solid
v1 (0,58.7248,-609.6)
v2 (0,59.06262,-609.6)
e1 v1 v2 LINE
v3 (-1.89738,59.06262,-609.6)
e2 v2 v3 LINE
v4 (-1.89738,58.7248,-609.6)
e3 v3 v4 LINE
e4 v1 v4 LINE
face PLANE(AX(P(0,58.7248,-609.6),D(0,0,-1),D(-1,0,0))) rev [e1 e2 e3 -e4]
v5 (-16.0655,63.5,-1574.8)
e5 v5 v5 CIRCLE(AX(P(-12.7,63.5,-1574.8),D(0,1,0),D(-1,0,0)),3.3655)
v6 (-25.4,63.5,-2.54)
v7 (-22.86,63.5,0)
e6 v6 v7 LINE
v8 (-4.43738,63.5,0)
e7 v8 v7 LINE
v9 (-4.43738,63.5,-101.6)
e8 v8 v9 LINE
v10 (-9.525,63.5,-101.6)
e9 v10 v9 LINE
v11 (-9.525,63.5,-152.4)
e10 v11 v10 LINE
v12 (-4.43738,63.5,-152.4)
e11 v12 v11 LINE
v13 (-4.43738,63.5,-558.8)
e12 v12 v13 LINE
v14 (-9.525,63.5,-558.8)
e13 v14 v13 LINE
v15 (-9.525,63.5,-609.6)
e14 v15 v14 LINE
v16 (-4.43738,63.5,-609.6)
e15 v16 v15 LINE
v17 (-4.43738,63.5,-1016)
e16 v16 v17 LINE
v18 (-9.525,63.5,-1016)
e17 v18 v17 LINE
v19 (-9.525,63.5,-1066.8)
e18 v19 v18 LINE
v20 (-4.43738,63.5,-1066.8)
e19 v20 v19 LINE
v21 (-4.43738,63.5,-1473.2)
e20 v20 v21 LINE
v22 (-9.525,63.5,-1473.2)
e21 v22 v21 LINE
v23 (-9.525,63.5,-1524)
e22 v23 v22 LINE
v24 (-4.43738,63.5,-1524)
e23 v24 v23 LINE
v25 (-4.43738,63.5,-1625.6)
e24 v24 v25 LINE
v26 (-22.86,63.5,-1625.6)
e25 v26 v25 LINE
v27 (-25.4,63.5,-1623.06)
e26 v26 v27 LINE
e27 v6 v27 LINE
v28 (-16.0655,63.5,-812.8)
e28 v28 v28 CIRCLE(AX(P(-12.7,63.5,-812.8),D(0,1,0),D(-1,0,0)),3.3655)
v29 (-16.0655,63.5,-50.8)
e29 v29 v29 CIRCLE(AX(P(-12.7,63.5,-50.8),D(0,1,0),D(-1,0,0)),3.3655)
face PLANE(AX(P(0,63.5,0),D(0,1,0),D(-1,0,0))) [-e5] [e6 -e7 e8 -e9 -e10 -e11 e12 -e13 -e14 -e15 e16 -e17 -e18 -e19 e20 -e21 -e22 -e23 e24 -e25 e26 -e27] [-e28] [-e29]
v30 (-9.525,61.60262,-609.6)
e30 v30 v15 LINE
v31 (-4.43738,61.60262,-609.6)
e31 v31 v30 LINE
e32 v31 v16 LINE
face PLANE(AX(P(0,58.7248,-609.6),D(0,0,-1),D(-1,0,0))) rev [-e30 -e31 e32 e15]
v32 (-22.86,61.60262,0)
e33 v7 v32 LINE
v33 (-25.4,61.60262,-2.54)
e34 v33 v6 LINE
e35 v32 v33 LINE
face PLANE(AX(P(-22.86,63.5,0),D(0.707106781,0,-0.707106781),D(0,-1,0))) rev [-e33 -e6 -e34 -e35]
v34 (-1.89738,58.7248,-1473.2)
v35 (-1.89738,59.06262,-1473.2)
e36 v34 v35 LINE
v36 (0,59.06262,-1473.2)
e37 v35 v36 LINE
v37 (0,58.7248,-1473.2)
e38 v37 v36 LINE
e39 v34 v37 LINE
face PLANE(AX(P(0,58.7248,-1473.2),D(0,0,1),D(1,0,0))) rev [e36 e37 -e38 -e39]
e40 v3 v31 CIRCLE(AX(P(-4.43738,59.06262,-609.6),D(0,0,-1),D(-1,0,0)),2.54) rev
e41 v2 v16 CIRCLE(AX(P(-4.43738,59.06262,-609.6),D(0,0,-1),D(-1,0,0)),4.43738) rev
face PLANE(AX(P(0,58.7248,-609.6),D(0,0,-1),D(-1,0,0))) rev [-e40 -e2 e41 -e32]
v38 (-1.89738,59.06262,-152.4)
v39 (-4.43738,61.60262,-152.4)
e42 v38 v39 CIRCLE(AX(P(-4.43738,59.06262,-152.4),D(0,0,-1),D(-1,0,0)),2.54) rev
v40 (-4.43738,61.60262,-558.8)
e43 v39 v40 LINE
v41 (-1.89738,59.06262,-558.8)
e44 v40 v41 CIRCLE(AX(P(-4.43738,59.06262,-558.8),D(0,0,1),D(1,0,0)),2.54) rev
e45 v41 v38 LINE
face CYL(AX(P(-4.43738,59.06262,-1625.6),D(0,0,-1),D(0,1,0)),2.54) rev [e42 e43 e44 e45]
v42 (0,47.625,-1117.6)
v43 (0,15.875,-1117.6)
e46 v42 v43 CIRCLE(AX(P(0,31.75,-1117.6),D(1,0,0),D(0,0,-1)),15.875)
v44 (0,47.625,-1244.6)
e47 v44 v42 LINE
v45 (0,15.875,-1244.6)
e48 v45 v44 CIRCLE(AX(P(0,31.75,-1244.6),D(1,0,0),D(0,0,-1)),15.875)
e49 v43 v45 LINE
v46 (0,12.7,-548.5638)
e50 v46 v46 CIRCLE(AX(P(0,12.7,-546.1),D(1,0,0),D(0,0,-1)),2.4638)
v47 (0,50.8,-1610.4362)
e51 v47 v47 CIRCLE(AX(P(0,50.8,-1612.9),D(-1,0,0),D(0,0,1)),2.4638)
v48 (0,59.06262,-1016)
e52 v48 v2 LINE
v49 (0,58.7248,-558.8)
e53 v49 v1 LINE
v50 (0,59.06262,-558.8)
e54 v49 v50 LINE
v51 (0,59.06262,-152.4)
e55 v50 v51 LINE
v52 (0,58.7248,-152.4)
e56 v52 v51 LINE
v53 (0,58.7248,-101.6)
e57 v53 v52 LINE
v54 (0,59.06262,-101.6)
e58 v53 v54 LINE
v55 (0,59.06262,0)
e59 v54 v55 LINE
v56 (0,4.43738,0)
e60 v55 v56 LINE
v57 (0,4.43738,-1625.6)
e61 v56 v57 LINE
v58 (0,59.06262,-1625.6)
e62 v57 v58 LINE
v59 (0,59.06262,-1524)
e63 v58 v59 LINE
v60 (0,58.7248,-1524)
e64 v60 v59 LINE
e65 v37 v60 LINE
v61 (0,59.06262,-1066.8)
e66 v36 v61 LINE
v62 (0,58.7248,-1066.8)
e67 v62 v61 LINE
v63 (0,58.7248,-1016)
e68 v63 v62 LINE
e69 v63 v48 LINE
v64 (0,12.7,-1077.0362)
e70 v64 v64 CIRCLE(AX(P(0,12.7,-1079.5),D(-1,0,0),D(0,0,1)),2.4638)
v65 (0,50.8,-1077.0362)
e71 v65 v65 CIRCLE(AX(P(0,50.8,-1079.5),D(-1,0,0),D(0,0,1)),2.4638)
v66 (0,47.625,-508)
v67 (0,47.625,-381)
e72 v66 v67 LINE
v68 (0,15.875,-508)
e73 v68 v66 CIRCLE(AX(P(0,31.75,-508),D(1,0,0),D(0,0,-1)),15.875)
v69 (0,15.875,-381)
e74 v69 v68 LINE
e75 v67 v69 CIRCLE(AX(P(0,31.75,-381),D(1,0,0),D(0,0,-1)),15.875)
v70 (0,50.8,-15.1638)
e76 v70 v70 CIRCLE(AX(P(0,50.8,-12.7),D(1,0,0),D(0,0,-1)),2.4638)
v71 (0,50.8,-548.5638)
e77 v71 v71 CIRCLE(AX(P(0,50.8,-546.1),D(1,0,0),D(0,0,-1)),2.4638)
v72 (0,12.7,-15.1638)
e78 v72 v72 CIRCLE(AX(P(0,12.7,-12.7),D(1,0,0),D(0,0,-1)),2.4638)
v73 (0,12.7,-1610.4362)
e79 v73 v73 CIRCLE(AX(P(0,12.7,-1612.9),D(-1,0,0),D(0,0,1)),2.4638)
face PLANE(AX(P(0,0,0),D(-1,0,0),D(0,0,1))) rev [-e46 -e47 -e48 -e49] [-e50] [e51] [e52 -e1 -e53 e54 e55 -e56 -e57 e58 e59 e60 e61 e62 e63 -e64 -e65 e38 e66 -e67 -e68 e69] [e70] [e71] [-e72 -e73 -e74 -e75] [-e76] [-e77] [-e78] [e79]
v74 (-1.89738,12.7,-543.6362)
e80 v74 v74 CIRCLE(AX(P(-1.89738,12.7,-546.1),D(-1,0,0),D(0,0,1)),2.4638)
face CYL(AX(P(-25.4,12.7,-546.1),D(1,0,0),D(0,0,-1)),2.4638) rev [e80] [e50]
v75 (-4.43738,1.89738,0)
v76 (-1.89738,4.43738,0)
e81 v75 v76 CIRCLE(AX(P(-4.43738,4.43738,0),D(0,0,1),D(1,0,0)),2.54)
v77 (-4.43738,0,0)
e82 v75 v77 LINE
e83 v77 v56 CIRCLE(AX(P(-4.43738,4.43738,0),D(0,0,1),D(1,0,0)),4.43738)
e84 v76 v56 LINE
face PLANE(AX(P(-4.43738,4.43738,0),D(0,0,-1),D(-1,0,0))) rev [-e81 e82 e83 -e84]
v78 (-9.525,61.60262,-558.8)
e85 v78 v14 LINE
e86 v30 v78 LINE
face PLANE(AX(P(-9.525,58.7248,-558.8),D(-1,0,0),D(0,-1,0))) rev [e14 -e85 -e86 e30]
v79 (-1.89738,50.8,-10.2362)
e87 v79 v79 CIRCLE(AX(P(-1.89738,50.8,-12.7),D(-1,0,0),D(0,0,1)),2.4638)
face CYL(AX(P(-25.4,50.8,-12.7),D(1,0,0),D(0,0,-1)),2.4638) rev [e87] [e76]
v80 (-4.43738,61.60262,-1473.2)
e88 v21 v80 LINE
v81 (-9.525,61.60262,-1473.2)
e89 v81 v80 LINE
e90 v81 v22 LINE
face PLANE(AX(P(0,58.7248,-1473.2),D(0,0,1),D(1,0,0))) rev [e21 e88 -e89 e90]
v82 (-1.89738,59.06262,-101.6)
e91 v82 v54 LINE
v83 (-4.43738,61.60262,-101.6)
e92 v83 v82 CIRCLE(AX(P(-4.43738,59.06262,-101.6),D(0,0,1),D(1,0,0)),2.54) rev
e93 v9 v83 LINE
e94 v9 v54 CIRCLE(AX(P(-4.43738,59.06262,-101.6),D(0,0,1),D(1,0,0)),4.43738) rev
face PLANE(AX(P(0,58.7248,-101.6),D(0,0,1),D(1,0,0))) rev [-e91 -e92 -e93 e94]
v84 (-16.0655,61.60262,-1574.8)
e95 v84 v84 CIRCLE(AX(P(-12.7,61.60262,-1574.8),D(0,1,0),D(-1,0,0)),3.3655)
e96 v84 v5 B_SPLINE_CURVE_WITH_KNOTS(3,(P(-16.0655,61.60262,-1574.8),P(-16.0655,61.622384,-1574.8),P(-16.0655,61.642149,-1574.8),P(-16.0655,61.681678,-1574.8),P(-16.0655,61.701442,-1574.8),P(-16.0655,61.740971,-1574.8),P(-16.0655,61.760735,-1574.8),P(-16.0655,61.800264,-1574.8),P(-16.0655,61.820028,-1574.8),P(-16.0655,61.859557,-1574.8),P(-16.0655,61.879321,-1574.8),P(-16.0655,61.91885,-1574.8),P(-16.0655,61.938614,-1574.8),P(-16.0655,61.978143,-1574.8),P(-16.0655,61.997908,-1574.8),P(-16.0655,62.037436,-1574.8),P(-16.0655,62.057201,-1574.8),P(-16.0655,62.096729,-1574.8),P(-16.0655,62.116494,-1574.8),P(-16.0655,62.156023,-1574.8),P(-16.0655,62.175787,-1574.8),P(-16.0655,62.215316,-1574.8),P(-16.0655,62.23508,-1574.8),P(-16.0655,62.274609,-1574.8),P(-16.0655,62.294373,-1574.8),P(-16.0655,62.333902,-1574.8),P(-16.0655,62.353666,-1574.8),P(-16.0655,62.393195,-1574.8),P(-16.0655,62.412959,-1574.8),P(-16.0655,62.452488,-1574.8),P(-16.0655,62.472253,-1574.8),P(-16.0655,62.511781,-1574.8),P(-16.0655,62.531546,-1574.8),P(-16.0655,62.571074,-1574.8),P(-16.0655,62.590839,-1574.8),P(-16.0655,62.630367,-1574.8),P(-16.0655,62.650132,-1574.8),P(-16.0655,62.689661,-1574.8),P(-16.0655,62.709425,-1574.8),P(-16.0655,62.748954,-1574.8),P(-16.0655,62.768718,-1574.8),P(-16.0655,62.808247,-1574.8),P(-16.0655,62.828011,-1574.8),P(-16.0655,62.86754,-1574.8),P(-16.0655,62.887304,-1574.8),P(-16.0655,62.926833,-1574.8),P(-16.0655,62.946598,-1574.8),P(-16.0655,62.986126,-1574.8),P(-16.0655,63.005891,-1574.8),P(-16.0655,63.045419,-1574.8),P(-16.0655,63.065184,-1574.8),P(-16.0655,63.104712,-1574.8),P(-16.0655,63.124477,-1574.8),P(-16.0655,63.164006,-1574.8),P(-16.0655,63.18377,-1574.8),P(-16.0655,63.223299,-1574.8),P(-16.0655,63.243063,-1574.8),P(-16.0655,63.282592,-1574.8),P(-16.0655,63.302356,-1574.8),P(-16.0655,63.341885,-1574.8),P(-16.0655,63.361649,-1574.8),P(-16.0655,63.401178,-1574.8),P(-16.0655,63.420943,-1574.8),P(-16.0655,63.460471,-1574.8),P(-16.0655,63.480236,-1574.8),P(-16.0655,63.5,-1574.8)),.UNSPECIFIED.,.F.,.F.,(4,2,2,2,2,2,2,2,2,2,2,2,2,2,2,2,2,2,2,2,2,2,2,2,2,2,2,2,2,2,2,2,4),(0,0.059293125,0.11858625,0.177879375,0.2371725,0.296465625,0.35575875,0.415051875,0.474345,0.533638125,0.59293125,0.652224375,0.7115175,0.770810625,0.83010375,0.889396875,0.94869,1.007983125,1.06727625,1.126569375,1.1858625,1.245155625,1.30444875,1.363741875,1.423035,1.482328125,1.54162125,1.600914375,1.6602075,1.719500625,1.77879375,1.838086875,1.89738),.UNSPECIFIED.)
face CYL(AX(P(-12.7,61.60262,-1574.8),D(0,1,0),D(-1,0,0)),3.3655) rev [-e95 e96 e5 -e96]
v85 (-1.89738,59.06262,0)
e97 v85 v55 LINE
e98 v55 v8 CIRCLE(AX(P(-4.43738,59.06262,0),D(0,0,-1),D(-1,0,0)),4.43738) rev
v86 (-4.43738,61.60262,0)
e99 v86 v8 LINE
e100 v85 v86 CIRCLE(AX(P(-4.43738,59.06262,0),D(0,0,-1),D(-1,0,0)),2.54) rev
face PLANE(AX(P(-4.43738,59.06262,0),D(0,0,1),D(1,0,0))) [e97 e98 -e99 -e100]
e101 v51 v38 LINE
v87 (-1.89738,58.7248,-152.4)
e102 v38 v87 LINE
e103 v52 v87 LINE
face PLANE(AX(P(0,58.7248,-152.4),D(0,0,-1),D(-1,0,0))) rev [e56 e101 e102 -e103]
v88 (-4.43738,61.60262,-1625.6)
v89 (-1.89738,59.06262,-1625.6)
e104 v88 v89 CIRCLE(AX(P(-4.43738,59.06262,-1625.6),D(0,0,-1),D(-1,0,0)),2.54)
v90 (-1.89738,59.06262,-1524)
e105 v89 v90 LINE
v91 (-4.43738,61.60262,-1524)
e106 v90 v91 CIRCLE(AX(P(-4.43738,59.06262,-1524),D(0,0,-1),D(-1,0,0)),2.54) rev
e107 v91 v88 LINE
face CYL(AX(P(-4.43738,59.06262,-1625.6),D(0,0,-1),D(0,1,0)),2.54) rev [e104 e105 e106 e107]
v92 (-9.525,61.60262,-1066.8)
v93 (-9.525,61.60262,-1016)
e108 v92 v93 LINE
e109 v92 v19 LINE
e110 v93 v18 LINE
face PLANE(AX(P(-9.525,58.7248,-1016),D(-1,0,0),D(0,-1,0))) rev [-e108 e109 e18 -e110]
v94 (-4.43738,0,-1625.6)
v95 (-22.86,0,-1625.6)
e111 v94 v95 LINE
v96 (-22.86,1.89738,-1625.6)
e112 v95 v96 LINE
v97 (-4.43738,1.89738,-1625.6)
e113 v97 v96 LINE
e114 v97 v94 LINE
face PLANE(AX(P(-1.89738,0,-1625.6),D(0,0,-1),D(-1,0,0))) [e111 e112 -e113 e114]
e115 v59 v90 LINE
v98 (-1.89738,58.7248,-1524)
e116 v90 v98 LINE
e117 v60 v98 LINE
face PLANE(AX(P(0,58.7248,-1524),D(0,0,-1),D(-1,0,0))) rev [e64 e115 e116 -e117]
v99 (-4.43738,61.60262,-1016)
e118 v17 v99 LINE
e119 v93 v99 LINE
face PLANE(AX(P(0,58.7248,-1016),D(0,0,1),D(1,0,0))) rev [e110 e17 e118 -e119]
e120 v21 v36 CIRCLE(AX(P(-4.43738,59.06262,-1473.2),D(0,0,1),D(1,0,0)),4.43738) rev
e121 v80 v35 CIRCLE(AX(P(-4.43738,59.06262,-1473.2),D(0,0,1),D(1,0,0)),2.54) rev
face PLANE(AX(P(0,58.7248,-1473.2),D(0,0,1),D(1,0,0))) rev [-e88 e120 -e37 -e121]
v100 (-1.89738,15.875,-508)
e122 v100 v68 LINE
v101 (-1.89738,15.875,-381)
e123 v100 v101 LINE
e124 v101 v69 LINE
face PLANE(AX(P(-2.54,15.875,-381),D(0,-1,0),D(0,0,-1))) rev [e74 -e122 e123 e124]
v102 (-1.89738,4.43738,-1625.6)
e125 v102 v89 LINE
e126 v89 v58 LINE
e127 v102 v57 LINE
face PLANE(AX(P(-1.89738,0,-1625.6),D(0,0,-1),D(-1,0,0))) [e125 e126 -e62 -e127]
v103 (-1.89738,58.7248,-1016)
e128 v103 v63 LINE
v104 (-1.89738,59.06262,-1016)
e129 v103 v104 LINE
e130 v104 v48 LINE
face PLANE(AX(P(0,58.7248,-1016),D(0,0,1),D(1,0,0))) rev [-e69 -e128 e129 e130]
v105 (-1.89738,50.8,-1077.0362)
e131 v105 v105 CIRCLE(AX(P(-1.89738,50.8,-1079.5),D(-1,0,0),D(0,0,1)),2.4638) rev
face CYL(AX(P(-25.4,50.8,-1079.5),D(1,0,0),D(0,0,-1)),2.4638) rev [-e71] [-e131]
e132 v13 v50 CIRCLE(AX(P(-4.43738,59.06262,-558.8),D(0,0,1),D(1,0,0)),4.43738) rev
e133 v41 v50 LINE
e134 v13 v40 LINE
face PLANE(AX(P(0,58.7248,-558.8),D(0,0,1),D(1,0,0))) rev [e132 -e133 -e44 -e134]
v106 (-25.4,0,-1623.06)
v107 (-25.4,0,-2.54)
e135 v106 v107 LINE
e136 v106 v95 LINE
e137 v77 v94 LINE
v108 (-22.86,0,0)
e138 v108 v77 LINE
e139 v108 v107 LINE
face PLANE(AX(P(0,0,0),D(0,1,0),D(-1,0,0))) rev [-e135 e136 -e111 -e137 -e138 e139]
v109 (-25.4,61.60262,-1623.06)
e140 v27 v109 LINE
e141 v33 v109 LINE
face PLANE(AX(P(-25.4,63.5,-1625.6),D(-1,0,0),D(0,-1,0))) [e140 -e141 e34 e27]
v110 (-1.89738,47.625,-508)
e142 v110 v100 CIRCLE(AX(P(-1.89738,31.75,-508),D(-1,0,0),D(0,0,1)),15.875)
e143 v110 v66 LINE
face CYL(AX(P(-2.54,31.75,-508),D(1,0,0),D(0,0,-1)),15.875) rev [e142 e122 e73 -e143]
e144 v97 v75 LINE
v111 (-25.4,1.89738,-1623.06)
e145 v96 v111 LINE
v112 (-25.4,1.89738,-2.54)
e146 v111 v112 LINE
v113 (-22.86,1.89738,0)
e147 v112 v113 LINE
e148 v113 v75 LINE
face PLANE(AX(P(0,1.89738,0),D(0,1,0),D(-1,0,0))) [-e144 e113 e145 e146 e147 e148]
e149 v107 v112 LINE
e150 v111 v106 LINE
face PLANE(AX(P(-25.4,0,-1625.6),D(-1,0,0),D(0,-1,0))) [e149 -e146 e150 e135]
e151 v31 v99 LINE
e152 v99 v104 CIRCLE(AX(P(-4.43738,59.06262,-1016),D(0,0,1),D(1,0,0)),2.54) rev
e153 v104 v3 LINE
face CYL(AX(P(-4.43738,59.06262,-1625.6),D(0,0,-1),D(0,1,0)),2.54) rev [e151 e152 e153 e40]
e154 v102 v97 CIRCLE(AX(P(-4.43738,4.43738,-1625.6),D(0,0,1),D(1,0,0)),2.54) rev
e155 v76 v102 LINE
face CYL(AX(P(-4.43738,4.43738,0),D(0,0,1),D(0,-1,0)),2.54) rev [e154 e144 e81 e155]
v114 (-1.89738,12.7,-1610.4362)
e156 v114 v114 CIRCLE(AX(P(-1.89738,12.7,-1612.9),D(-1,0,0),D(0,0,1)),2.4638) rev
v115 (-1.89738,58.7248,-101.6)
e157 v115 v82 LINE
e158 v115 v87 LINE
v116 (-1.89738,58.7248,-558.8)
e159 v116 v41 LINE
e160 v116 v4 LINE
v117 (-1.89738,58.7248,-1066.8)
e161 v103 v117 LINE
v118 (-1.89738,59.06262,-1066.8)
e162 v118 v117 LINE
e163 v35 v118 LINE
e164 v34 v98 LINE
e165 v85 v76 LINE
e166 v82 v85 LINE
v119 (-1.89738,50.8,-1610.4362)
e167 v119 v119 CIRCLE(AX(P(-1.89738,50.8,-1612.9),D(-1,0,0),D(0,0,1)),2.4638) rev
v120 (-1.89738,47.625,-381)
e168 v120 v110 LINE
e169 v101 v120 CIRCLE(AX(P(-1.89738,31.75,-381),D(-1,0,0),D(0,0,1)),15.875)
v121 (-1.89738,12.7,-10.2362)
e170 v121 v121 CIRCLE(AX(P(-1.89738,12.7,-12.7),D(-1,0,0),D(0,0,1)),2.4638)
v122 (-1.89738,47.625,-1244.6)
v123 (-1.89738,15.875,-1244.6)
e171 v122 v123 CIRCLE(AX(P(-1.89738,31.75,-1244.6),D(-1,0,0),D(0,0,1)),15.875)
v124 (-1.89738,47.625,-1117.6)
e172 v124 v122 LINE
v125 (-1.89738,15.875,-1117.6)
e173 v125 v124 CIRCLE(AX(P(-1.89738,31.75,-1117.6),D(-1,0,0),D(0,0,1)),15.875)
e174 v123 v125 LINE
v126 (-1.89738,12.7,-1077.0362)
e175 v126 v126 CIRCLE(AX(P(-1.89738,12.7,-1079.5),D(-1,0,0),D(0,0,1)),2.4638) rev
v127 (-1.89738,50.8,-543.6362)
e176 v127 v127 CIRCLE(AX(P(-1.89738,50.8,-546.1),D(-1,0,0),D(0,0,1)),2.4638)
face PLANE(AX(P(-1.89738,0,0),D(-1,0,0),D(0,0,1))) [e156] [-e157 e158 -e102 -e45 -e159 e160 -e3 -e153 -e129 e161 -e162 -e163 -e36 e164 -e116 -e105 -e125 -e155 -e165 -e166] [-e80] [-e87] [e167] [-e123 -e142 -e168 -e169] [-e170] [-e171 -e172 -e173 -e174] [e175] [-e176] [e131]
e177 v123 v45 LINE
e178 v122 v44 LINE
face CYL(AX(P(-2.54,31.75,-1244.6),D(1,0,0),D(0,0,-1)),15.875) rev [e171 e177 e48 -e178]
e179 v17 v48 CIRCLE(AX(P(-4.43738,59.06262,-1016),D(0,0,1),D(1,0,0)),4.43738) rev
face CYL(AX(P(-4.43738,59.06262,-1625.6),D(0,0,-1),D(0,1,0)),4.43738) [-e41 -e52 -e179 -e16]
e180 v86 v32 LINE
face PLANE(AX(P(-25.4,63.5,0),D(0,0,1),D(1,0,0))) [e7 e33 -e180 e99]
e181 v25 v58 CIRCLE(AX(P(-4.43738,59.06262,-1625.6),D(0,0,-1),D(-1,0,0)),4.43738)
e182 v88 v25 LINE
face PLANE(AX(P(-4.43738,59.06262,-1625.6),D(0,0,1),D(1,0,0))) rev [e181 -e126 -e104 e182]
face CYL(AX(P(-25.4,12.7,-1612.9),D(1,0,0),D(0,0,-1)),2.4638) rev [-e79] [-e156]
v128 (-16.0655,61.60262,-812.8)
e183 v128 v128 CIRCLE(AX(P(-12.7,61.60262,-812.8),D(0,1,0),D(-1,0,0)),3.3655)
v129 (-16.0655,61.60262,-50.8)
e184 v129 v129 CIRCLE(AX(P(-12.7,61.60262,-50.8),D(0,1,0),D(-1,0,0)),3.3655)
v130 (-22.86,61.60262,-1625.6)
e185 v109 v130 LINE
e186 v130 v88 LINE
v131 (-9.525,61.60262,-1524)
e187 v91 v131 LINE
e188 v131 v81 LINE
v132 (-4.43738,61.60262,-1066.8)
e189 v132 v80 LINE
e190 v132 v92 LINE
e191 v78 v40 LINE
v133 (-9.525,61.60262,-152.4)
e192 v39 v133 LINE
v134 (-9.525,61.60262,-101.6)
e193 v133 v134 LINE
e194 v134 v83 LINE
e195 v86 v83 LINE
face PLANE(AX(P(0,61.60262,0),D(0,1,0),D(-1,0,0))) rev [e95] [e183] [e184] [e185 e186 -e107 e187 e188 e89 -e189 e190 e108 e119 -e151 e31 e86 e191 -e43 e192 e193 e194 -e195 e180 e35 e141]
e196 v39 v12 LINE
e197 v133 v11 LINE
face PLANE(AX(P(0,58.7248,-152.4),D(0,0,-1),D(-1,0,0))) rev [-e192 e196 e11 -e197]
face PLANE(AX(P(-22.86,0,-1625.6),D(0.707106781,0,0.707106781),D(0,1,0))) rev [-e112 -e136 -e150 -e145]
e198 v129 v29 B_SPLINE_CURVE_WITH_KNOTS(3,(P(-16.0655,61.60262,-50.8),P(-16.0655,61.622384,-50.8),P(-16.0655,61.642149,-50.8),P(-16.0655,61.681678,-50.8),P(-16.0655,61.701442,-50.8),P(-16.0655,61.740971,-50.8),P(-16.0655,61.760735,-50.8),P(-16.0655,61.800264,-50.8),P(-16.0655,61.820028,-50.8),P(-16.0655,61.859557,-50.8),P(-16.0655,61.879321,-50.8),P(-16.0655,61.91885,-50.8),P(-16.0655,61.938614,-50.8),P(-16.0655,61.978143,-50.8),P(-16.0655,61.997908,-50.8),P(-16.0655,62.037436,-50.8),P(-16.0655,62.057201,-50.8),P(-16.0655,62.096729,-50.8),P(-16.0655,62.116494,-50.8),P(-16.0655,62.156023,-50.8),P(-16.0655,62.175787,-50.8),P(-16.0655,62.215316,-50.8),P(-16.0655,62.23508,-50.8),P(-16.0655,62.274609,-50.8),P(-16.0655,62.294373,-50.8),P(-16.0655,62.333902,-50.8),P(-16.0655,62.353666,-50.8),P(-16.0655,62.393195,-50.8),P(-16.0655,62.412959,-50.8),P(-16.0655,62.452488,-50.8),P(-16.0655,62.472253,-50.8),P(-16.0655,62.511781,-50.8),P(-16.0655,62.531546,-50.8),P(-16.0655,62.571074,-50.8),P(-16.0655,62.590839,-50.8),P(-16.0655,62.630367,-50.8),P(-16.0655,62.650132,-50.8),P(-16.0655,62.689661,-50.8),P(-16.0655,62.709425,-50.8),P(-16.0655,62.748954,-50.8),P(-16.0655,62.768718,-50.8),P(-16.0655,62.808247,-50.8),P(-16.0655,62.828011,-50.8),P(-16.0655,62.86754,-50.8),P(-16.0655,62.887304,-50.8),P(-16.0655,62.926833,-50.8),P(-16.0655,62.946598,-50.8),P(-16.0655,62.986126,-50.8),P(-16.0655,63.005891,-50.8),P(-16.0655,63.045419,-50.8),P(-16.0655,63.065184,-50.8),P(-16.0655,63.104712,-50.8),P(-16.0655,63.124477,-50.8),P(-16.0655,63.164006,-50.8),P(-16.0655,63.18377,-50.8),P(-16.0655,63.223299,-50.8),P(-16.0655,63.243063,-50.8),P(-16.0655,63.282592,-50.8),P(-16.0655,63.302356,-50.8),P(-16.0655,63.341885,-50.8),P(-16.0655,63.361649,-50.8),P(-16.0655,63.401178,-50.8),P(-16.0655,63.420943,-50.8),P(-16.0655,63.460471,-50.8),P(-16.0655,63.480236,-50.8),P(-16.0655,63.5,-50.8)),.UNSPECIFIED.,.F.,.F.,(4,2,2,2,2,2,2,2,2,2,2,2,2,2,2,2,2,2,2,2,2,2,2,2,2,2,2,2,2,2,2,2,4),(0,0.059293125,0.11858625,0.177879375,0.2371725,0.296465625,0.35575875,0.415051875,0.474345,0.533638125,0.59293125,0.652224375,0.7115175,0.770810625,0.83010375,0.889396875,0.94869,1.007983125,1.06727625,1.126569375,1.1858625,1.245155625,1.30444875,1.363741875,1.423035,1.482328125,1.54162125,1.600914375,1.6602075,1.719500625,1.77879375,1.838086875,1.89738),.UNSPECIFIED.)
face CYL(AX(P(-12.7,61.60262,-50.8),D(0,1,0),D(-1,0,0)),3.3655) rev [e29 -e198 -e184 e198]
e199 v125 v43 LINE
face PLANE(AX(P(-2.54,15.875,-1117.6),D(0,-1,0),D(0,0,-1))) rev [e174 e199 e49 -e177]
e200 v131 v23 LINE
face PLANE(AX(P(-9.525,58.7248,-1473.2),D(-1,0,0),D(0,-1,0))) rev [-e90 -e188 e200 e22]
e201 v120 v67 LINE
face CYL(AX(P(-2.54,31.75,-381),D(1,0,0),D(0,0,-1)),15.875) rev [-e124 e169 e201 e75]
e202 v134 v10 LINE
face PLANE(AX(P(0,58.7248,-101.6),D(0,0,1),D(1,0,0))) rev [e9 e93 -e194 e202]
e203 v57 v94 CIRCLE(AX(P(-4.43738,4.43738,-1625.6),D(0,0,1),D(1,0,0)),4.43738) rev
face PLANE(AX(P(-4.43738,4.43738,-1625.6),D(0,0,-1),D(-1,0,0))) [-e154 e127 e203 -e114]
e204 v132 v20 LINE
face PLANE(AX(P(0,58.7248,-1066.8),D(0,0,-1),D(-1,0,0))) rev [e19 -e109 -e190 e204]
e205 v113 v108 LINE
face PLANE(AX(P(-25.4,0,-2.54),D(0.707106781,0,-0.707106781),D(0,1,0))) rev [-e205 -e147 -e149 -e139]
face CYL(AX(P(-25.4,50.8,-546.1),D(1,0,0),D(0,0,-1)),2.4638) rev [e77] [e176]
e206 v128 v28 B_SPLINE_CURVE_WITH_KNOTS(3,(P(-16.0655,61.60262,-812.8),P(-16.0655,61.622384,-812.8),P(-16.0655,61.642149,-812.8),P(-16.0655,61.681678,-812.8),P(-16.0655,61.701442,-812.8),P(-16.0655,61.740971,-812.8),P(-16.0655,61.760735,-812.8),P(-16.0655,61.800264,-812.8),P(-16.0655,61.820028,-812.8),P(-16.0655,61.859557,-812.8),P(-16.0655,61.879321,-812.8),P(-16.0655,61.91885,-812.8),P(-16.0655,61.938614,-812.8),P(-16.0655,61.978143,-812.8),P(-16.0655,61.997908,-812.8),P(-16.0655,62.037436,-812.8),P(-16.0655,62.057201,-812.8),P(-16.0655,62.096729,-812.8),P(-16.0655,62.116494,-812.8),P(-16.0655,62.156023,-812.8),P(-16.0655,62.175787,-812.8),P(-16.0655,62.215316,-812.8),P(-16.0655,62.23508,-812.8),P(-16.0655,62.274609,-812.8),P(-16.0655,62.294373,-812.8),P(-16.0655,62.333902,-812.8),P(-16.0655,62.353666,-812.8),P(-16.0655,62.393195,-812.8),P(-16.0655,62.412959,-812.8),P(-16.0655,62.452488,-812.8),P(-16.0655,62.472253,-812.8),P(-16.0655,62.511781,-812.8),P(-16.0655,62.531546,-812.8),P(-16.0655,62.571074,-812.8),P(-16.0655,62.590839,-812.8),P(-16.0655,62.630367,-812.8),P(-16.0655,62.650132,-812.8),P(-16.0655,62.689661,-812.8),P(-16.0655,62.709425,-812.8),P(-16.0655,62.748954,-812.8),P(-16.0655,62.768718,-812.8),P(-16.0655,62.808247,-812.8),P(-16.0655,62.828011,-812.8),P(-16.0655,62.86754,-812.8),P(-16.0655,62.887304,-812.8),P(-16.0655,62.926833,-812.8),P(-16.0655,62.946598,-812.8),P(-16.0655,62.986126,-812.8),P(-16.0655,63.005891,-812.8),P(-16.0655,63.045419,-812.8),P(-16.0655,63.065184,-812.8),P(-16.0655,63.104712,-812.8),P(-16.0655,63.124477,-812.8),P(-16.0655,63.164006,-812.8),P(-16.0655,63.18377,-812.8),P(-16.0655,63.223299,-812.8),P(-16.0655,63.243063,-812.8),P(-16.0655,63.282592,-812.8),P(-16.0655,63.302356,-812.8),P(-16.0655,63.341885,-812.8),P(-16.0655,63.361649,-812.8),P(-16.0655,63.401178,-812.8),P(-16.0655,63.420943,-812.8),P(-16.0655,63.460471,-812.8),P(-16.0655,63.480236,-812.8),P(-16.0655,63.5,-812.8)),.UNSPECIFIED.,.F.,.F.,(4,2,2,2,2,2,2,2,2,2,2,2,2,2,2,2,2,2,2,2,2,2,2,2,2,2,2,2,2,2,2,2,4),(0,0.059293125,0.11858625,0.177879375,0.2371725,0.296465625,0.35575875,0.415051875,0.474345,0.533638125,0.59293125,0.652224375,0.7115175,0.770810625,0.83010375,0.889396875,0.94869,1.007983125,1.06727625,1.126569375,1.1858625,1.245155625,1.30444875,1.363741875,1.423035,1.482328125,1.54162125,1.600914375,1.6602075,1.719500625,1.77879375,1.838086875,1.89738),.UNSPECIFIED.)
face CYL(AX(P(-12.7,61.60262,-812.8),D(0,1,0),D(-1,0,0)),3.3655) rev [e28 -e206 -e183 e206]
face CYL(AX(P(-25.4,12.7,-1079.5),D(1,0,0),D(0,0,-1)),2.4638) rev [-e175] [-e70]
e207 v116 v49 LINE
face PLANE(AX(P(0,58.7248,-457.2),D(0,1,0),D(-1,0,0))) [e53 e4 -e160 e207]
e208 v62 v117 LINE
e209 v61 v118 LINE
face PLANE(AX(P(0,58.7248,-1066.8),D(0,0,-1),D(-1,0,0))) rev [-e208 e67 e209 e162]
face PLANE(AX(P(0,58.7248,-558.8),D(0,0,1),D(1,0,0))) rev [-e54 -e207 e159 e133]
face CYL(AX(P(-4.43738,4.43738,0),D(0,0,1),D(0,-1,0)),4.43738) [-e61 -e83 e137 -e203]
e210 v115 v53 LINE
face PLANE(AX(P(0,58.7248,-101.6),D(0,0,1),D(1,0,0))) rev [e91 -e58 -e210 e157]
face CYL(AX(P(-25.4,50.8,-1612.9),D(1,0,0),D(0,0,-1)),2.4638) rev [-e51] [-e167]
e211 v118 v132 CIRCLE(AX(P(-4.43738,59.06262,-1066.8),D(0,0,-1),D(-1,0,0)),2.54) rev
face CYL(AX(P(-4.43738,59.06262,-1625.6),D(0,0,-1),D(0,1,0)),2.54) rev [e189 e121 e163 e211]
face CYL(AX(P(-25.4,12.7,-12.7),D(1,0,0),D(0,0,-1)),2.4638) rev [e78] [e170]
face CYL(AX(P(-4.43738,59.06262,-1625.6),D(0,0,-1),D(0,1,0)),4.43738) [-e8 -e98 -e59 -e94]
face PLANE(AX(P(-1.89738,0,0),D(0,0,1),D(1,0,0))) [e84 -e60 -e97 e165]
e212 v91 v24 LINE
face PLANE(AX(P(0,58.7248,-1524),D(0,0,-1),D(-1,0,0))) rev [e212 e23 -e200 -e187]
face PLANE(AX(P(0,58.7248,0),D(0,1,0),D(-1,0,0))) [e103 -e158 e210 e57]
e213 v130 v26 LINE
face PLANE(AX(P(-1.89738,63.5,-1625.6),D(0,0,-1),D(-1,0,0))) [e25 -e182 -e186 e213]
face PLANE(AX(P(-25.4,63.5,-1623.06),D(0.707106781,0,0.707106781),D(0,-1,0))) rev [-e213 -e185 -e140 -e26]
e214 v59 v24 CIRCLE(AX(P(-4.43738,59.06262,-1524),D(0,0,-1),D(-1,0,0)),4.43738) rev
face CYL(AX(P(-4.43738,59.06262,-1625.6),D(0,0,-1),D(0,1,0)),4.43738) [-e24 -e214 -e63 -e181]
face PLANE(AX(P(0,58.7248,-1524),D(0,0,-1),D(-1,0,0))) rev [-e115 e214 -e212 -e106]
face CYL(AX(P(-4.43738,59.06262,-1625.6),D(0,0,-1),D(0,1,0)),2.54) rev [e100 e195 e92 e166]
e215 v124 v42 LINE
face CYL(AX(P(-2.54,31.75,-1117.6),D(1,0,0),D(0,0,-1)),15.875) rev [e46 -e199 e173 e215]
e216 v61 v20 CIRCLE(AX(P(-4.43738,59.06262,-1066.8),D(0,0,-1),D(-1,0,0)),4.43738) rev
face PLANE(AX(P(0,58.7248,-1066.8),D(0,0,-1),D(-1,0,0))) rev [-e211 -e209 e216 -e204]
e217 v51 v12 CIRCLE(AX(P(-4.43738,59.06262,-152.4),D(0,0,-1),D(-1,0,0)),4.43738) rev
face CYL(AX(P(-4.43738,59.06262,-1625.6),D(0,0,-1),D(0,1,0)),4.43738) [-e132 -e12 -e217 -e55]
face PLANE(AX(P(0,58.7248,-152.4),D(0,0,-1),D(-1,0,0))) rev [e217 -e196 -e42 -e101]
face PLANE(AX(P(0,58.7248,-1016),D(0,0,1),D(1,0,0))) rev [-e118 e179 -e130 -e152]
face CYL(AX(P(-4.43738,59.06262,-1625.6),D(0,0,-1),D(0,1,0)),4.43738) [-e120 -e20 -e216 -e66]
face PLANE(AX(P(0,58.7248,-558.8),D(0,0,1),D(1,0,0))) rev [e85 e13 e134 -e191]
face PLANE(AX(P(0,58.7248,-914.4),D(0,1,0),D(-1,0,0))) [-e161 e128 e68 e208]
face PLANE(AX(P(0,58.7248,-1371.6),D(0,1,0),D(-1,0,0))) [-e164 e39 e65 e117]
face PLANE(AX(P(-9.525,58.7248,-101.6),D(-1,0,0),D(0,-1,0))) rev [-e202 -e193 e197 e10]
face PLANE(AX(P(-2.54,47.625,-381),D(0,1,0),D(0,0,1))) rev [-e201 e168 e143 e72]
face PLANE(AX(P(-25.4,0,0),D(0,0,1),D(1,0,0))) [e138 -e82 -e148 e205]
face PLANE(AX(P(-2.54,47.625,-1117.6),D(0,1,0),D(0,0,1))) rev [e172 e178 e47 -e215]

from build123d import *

# Parameters (mm, degrees)
SKETCH1_W                      = 1625.6
SKETCH1_H                      = 63.5
BASE_FLANGE1_DEPTH             = 1.89738
EDGE_FLANGE1_STRIP_W           = 12.66952
EDGE_FLANGE1_STRIP_H           = 1.89738
EDGE_FLANGE1_STRIP_CUT_DEPTH   = 1625.6
EDGE_FLANGE1_STRIP_2_W         = 12.66952
EDGE_FLANGE1_STRIP_2_H         = 1.89738
EDGE_FLANGE1_STRIP_CUT_2_DEPTH = 1625.6
EDGE_FLANGE1_DEPTH             = 1625.6
EDGE_FLANGE1_BEND_DEPTH        = 1625.6
SKETCH15_W                     = 9.525
SKETCH15_H                     = 50.8
CUT_EXTRUDE2_DEPTH             = 4.7752
LPATTERN3_COUNT                = 4
LPATTERN3_PITCH                = 457.2
SKETCH16_R                     = 3.3655
CUT_EXTRUDE3_DEPTH             = 2.54
LPATTERN4_COUNT                = 3
LPATTERN4_PITCH                = 762
CUT_EXTRUDE4_DEPTH             = 2.54
LPATTERN5_COUNT                = 2
LPATTERN5_PITCH                = 736.6
SKETCH18_R                     = 2.4638
CUT_EXTRUDE5_DEPTH             = 1628.038035818
SKETCH19_R                     = 2.4638
CUT_EXTRUDE6_DEPTH             = 1628.038035818
CHAMFER1_SIZE                  = 2.54


# Sheet-metal steps are written as plain solids
with BuildPart() as part:
    # Sketch1 → Base-Flange1 (new body)
    with BuildSketch(Plane(origin=(0, 0, 0), x_dir=(0, 0, -1), z_dir=(1, 0, 0))):
        with Locations((812.8, 31.75)):
            Rectangle(SKETCH1_W, SKETCH1_H)
    extrude(amount=-BASE_FLANGE1_DEPTH)

    # Edge-Flange1 strip (across the edge) → Edge-Flange1 strip cut (cut)
    with BuildSketch(Plane(origin=(-1.89738, 63.5, 0), x_dir=(0, -1, 0), z_dir=(0, 0, -1))):
        with Locations((-1.89738, -0.94869)):
            Rectangle(EDGE_FLANGE1_STRIP_W, EDGE_FLANGE1_STRIP_H)
    extrude(amount=EDGE_FLANGE1_STRIP_CUT_DEPTH, mode=Mode.SUBTRACT)

    # Edge-Flange1 strip 2 (across the edge) → Edge-Flange1 strip cut 2 (cut)
    with BuildSketch(Plane(origin=(-1.89738, 0, -1625.6), x_dir=(0, 1, 0), z_dir=(0, 0, 1))):
        with Locations((-1.89738, -0.94869)):
            Rectangle(EDGE_FLANGE1_STRIP_2_W, EDGE_FLANGE1_STRIP_2_H)
    extrude(amount=EDGE_FLANGE1_STRIP_CUT_2_DEPTH, mode=Mode.SUBTRACT)

    # Edge-Flange1 section (across the edge) → Edge-Flange1 (add)
    with BuildSketch(Plane(origin=(-1.89738, 63.5, 0), x_dir=(0, -1, 0), z_dir=(0, 0, -1))):
        with BuildLine():
            Line((0, 2.54), (0, 23.50262))
            Line((0, 23.50262), (1.89738, 23.50262))
            Line((1.89738, 23.50262), (1.89738, 2.54))
            ThreePointArc((1.89738, 2.54), (2.641328776, 0.743948776), (4.43738, 0))
            Line((4.43738, 0), (4.43738, -1.89738))
            ThreePointArc((4.43738, -1.89738), (1.299678511, -0.597701489), (0, 2.54))
        make_face()
    extrude(amount=EDGE_FLANGE1_DEPTH)

    # Edge-Flange1 section 2 (across the edge) → Edge-Flange1 bend (add)
    with BuildSketch(Plane(origin=(-1.89738, 0, -1625.6), x_dir=(0, 1, 0), z_dir=(0, 0, 1))):
        with BuildLine():
            Line((0, 2.54), (0, 23.50262))
            Line((0, 23.50262), (1.89738, 23.50262))
            Line((1.89738, 23.50262), (1.89738, 2.54))
            ThreePointArc((1.89738, 2.54), (2.641328776, 0.743948776), (4.43738, 0))
            Line((4.43738, 0), (4.43738, -1.89738))
            ThreePointArc((4.43738, -1.89738), (1.299678511, -0.597701489), (0, 2.54))
        make_face()
    extrude(amount=EDGE_FLANGE1_BEND_DEPTH)

    # Sketch15 → Cut-Extrude2 (cut)
    with BuildSketch(Plane(origin=(0, 63.5, 0), x_dir=(1, 0, 0), z_dir=(0, 1, 0))):
        with Locations((-4.7625, 127)):
            Rectangle(SKETCH15_W, SKETCH15_H)
    cut_extrude2 = extrude(amount=-CUT_EXTRUDE2_DEPTH, mode=Mode.SUBTRACT)

    # LPattern3: Cut-Extrude2 ×4
    with Locations(*[(0, 0, -i * LPATTERN3_PITCH) for i in range(1, LPATTERN3_COUNT)]):
        add(cut_extrude2, mode=Mode.SUBTRACT)

    # Sketch16 → Cut-Extrude3 (cut)
    with BuildSketch(Plane(origin=(0, 63.5, 0), x_dir=(1, 0, 0), z_dir=(0, 1, 0))):
        with Locations(Location((-12.7, 1574.8, 0), (0, 0, 180))):
            Circle(SKETCH16_R)
    cut_extrude3 = extrude(amount=-CUT_EXTRUDE3_DEPTH, mode=Mode.SUBTRACT)

    # LPattern4: Cut-Extrude3 ×3
    with Locations(*[(0, 0, i * LPATTERN4_PITCH) for i in range(1, LPATTERN4_COUNT)]):
        add(cut_extrude3, mode=Mode.SUBTRACT)

    # Sketch17 → Cut-Extrude4 (cut)
    with BuildSketch(Plane(origin=(0, 0, 0), x_dir=(0, 0, -1), z_dir=(1, 0, 0))):
        with BuildLine():
            Line((381, 47.625), (508, 47.625))
            ThreePointArc((508, 47.625), (523.875, 31.75), (508, 15.875))
            Line((508, 15.875), (381, 15.875))
            ThreePointArc((381, 15.875), (365.125, 31.75), (381, 47.625))
        make_face()
    cut_extrude4 = extrude(amount=-CUT_EXTRUDE4_DEPTH, mode=Mode.SUBTRACT)

    # LPattern5: Cut-Extrude4 ×2
    with Locations(*[(0, 0, -i * LPATTERN5_PITCH) for i in range(1, LPATTERN5_COUNT)]):
        add(cut_extrude4, mode=Mode.SUBTRACT)

    # Sketch18 → Cut-Extrude5 (cut, through all)
    with BuildSketch(Plane(origin=(0, 0, 0), x_dir=(0, 0, -1), z_dir=(1, 0, 0))):
        with Locations((546.1, 50.8)):
            Circle(SKETCH18_R)
        with Locations((546.1, 12.7)):
            Circle(SKETCH18_R)
    cut_extrude5 = extrude(amount=-CUT_EXTRUDE5_DEPTH, mode=Mode.SUBTRACT)

    # Sketch19 → Cut-Extrude6 (cut, through all)
    with BuildSketch(Plane(origin=(0, 0, 0), x_dir=(0, 0, -1), z_dir=(1, 0, 0))):
        with Locations((12.7, 50.8)):
            Circle(SKETCH19_R)
        with Locations((12.7, 12.7)):
            Circle(SKETCH19_R)
    cut_extrude6 = extrude(amount=-CUT_EXTRUDE6_DEPTH, mode=Mode.SUBTRACT)

    # Mirror1: Cut-Extrude5, Cut-Extrude6 across plane
    add(cut_extrude5.mirror(Plane.XY.offset(-812.8)), mode=Mode.SUBTRACT)
    add(cut_extrude6.mirror(Plane.XY.offset(-812.8)), mode=Mode.SUBTRACT)

    # Chamfer1
    chamfer1_edges = [part.edges().sort_by_distance(p)[0] for p in [
        (-25.4, 62.55131, 0),
        (-25.4, 62.55131, -1625.6),
        (-25.4, 0.94869, -1625.6),
        (-25.4, 0.94869, 0),
    ]]
    chamfer(chamfer1_edges, length=CHAMFER1_SIZE)


solid = part.part
